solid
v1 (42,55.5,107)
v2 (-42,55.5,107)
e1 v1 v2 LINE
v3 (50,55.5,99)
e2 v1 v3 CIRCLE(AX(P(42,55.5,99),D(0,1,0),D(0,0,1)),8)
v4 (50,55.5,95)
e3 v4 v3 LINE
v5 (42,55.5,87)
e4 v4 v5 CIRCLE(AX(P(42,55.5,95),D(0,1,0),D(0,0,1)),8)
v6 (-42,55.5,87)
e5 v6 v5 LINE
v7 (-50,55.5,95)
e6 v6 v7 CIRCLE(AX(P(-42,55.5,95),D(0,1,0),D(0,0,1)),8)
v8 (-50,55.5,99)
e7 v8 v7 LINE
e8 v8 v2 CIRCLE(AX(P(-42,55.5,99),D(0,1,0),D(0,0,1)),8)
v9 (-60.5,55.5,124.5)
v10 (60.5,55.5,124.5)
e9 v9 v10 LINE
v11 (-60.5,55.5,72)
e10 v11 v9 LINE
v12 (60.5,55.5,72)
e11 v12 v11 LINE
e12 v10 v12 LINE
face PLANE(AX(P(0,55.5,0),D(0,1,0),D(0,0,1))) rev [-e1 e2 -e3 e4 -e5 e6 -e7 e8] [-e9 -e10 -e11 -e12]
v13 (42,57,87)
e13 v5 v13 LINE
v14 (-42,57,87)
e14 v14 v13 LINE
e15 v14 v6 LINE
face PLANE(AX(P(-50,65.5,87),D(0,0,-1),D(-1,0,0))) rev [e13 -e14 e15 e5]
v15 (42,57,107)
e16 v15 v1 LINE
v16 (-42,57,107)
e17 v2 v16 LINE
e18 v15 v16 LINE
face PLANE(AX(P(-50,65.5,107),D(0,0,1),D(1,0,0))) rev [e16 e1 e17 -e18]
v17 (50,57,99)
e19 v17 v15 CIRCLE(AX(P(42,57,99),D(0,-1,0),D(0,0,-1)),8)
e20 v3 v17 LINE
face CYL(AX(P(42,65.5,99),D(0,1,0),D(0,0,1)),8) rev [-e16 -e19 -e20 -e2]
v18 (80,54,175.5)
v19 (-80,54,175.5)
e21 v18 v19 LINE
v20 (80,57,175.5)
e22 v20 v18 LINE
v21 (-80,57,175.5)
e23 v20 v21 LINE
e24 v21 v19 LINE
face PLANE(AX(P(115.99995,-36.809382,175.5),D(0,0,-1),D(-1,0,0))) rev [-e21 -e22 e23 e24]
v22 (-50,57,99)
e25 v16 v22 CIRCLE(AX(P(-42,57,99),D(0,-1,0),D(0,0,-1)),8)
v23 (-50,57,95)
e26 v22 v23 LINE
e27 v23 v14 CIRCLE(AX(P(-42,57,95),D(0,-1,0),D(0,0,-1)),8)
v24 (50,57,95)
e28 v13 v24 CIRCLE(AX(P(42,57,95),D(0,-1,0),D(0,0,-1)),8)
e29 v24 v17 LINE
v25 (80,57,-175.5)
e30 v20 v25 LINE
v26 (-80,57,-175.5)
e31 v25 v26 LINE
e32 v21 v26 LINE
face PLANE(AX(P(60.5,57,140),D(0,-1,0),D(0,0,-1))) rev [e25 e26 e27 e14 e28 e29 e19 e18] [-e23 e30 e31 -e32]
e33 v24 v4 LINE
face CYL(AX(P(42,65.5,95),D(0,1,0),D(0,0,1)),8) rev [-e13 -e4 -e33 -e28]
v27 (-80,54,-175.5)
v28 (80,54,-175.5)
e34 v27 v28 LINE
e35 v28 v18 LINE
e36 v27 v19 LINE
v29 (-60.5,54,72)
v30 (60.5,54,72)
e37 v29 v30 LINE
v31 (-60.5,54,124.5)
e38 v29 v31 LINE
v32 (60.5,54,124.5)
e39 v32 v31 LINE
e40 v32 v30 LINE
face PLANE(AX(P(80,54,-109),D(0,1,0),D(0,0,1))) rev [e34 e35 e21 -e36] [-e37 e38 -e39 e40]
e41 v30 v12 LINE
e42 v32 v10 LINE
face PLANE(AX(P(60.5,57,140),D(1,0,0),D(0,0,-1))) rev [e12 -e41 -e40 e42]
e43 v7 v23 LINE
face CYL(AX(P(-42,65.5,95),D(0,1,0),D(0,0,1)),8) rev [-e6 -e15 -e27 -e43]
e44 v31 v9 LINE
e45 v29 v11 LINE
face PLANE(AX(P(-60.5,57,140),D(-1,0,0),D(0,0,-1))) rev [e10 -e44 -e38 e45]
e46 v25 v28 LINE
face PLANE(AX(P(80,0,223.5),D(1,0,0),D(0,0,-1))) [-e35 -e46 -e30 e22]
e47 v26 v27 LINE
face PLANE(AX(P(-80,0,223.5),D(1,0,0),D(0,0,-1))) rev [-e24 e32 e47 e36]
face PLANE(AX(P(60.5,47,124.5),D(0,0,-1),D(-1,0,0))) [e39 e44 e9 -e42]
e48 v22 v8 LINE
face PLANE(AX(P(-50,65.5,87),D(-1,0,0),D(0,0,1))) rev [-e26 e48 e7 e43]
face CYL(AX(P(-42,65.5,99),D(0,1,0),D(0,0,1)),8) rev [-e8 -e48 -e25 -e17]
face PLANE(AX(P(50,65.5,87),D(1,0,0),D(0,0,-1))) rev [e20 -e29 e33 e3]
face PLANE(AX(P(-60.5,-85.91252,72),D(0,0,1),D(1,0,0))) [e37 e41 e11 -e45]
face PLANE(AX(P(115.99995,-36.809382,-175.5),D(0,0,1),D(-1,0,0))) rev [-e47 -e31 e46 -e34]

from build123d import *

# Parameters (mm, degrees)
EXTRUDE_1_DEPTH          = 140
EXTRUDE_1_DEPTH_BACK     = 140
EXTRUDE_3_DEPTH          = 35.5
CUT_EXTRUDE_2_REACH      = 197.473
SKETCH_6_W               = 150
SKETCH_6_H               = 80
CUT_EXTRUDE_4_DEPTH      = 6
EXTRUDE_4_DEPTH          = 60.5
CUT_EXTRUDE_START        = -59
CUT_EXTRUDE_6_DEPTH      = 55
CUT_EXTRUDE_START_2      = -4
CUT_EXTRUDE_7_DEPTH      = 27
CUT_EXTRUDE_8_DEPTH      = 35.5
CUT_EXTRUDE_START_3      = -35.5
CUT_EXTRUDE_9_DEPTH      = 35.5
EXTRUDE_5_REACH          = 300.939
SKETCH_25_W              = 121
SKETCH_25_H              = 10
EXTRUDE_6_DEPTH          = 21.5
SKETCH_27_W              = 121
SKETCH_27_H              = 52.5
EXTRUDE_7_DEPTH          = 1.5
SKETCH_28_W              = 121
SKETCH_28_H              = 2
EXTRUDE_8_DEPTH          = 10
CUT_EXTRUDE_11_REACH     = 346.114
SKETCH_29_R              = 2
PATTERN_CIRCULAR_2_COUNT = 10
CUT_EXTRUDE_12_REACH     = 346.114
SKETCH_30_R              = 2
PATTERN_CIRCULAR_3_COUNT = 10
MIRROR_START             = -140
MIRROR_10_OUTLINE_R      = 2
MIRROR_10_DEPTH          = 280
MIRROR_10_2_OUTLINE_R    = 2
MIRROR_10_2_DEPTH        = 4
MIRROR_START_2           = 136
MIRROR_10_3_OUTLINE_R    = 2
MIRROR_10_3_DEPTH        = 4
EXTRUDE_9_REACH          = 263.648
SKETCH_31_W              = 21
SKETCH_31_H              = 16.5
EXTRUDE_10_REACH         = 292.975
SKETCH_34_W              = 121
SKETCH_34_H              = 154
EXTRUDE_11_DEPTH         = 5
EXTRUDE_12_REACH         = 378.928
SKETCH_36_W              = 121
SKETCH_36_H              = 3
EXTRUDE_13_REACH         = 378.928
SKETCH_37_W              = 121
SKETCH_37_H              = 3
SKETCH_38_W              = 100
SKETCH_38_H              = 20
CUT_EXTRUDE_13_DEPTH     = 10
FILLET_1_R               = 8
SKETCH_40_W              = 344.103621996
SKETCH_40_H              = 61.572842363
SKETCH_40_W_2            = 92.051810998
SKETCH_40_H_2            = 3
CUT_EXTRUDE_16_DEPTH     = 399


# Read off the part's stored shape, not the designer's step: 镜向10
with BuildPart() as part:
    # 草图2 → 凸台-拉伸1 (new, two sides: drawn at the far end of the back side and taken through both)
    with BuildSketch(Plane.XY.offset(-EXTRUDE_1_DEPTH_BACK)):
        with BuildLine():
            Line((60.5, 57), (80, 57))
            add(Edge.make_bspline(
                [(80, 57), (110.715171184, 57), (118.023084898, 36.99301361), (125, 20.498008369), (125, 0)],
                knots=[0, 0, 0, 0, 0, 1, 1, 1, 1, 1], degree=4))
            add(Edge.make_bspline(
                [(80, -57), (110.715171184, -57), (118.023084898, -36.99301361), (125, -20.498008369), (125, 0)],
                knots=[0, 0, 0, 0, 0, 1, 1, 1, 1, 1], degree=4))
            Line((80, -57), (60.5, -57))
            Line((60.5, -57), (60.5, -35.5))
            ThreePointArc((60.5, -35.5), (96, 0), (60.5, 35.5))
            Line((60.5, 35.5), (60.5, 57))
        make_face()
    extrude(amount=EXTRUDE_1_DEPTH + EXTRUDE_1_DEPTH_BACK)

    # 草图5 → 凸台-拉伸3 (add)
    with BuildSketch(Plane.XY.offset(140)):
        with BuildLine():
            Line((60.5, -50), (60.5, -57))
            Line((60.5, -57), (80, -57))
            add(Edge.make_bspline(
                [(80, -57), (110.715171184, -57), (118.023084898, -36.99301361), (125, -20.498008369), (125, 0)],
                knots=[0, 0, 0, 0, 0, 1, 1, 1, 1, 1], degree=4))
            add(Edge.make_bspline(
                [(125, 0), (125, 20.498008369), (118.023084898, 36.99301361), (110.715171184, 57), (80, 57)],
                knots=[0, 0, 0, 0, 0, 1, 1, 1, 1, 1], degree=4))
            Line((80, 57), (60.5, 57))
            Line((60.5, 57), (60.5, 50))
            ThreePointArc((60.5, 50), (110.5, 0), (60.5, -50))
        make_face()
    extrude_3 = extrude(amount=EXTRUDE_3_DEPTH)

    # 镜向2: 凸台-拉伸3 across plane
    add(extrude_3.mirror(Plane.XY))

    # 草图6 → 切除-拉伸2 (cut, up to next)
    with BuildSketch(Plane.ZY.offset(-60.5), mode=Mode.PRIVATE) as cut_extrude_2_sk1:
        with Locations((-15, 0)):
            Rectangle(SKETCH_6_W, SKETCH_6_H)
    cut_extrude_2_tool1 = extrude(cut_extrude_2_sk1.sketch, amount=-CUT_EXTRUDE_2_REACH, mode=Mode.PRIVATE) & part.part
    add(cut_extrude_2_tool1.solids().sort_by_distance((60.5, 0, -15))[0], mode=Mode.SUBTRACT)

    # 草图9 → 切除-拉伸4 (cut, symmetric)
    with BuildSketch(Plane(origin=(0, 0, 0), x_dir=(1, 0, 0), z_dir=(0, 1, 0))):
        Polygon((113.429186382, -60), (119.929186382, -60), (119.929186382, -75), (116.929186382, -75), (111.929186382, -69.041232037), (113.429186382, -67.541232037), align=None)
    cut_extrude_4 = extrude(amount=CUT_EXTRUDE_4_DEPTH, both=True, mode=Mode.SUBTRACT)

    # 镜向3: 切除-拉伸4 across plane
    add(cut_extrude_4.mirror(Plane(origin=(0, 0, -15), x_dir=(1, 0, 0), z_dir=(0, 0, -1))), mode=Mode.SUBTRACT)

    # 草图10 → 凸台-拉伸4 (add)
    with BuildSketch(Plane.ZY.offset(-60.5)):
        Polygon((-90, 40), (-90, 35.5), (-92, 35.5), (-92, 42), (62, 42), (62, 35.5), (60, 35.5), (60, 40), align=None)
    extrude(amount=EXTRUDE_4_DEPTH)

    # 草图18 → 切除-拉伸6 (cut)
    with BuildSketch(Plane.XY.offset(140).offset(CUT_EXTRUDE_START)):
        with BuildLine():
            Line((60.5, 54), (60.5, 35.5))
            ThreePointArc((60.5, 35.5), (96, 0), (60.5, -35.5))
            Line((60.5, -35.5), (60.5, -54))
            Line((60.5, -54), (80, -54))
            add(Edge.make_bspline(
                [(80, -54), (84.874930894, -54), (88.983824843, -53.408674679), (94.293485921, -51.914645093), (95.921328006, -51.314644751), (98.940749379, -49.944603182), (100.332473442, -49.174486853), (102.921509382, -47.489185635), (104.118858715, -46.573864409), (106.351651802, -44.617586852), (107.387031345, -43.57654345), (110.285874468, -40.291394559), (111.943828956, -37.885646851), (114.834227827, -32.778060673), (116.065931681, -30.077252128), (118.174928997, -24.486846885), (119.052306998, -21.597764181), (120.481395372, -15.683640995), (121.033233096, -12.658872533), (121.792444122, -6.461288023), (122, -3.288695832), (122, 0)],
                knots=[0, 0, 0, 0, 0.125, 0.125, 0.1875, 0.1875, 0.25, 0.25, 0.3125, 0.3125, 0.375, 0.375, 0.5, 0.5, 0.625, 0.625, 0.75, 0.75, 0.875, 0.875, 1, 1, 1, 1], degree=3))
            add(Edge.make_bspline(
                [(122, 0), (122, 3.288695832), (121.792444122, 6.461288023), (121.033233096, 12.658872533), (120.481395372, 15.683640995), (119.052306998, 21.597764181), (118.174928997, 24.486846885), (116.065931681, 30.077252128), (114.834227827, 32.778060673), (111.943828956, 37.885646851), (110.285874468, 40.291394559), (107.387031345, 43.57654345), (106.351651802, 44.617586852), (104.118858715, 46.573864409), (102.921509382, 47.489185635), (100.332473442, 49.174486853), (98.940749379, 49.944603182), (95.921328006, 51.314644751), (94.293485921, 51.914645093), (88.983824843, 53.408674679), (84.874930894, 54), (80, 54)],
                knots=[0, 0, 0, 0, 0.125, 0.125, 0.25, 0.25, 0.375, 0.375, 0.5, 0.5, 0.625, 0.625, 0.6875, 0.6875, 0.75, 0.75, 0.8125, 0.8125, 0.875, 0.875, 1, 1, 1, 1], degree=3))
            Line((80, 54), (60.5, 54))
        make_face()
    extrude(amount=CUT_EXTRUDE_6_DEPTH, mode=Mode.SUBTRACT)

    # 草图19 → 切除-拉伸7 (cut)
    with BuildSketch(Plane(origin=(0, 0, -140), x_dir=(-1, 0, 0), z_dir=(0, 0, -1)).offset(CUT_EXTRUDE_START_2)):
        with BuildLine():
            Line((-60.5, 54), (-60.5, 35.5))
            ThreePointArc((-60.5, 35.5), (-96, 0), (-60.5, -35.5))
            Line((-60.5, -35.5), (-60.5, -54))
            Line((-60.5, -54), (-80, -54))
            add(Edge.make_bspline(
                [(-80, -54), (-84.874930894, -54), (-88.983824843, -53.408674679), (-94.293485921, -51.914645093), (-95.921328006, -51.314644751), (-98.940749379, -49.944603182), (-100.332473442, -49.174486853), (-102.921509382, -47.489185635), (-104.118858715, -46.573864409), (-106.351651802, -44.617586852), (-107.387031345, -43.57654345), (-110.285874468, -40.291394559), (-111.943828956, -37.885646851), (-114.834227827, -32.778060673), (-116.065931681, -30.077252128), (-118.174928997, -24.486846885), (-119.052306998, -21.597764181), (-120.481395372, -15.683640995), (-121.033233096, -12.658872533), (-121.792444122, -6.461288023), (-122, -3.288695832), (-122, 0)],
                knots=[0, 0, 0, 0, 0.125, 0.125, 0.1875, 0.1875, 0.25, 0.25, 0.3125, 0.3125, 0.375, 0.375, 0.5, 0.5, 0.625, 0.625, 0.75, 0.75, 0.875, 0.875, 1, 1, 1, 1], degree=3))
            add(Edge.make_bspline(
                [(-122, 0), (-122, 3.288695832), (-121.792444122, 6.461288023), (-121.033233096, 12.658872533), (-120.481395372, 15.683640995), (-119.052306998, 21.597764181), (-118.174928997, 24.486846885), (-116.065931681, 30.077252128), (-114.834227827, 32.778060673), (-111.943828956, 37.885646851), (-110.285874468, 40.291394559), (-107.387031345, 43.57654345), (-106.351651802, 44.617586852), (-104.118858715, 46.573864409), (-102.921509382, 47.489185635), (-100.332473442, 49.174486853), (-98.940749379, 49.944603182), (-95.921328006, 51.314644751), (-94.293485921, 51.914645093), (-88.983824843, 53.408674679), (-84.874930894, 54), (-80, 54)],
                knots=[0, 0, 0, 0, 0.125, 0.125, 0.25, 0.25, 0.375, 0.375, 0.5, 0.5, 0.625, 0.625, 0.6875, 0.6875, 0.75, 0.75, 0.8125, 0.8125, 0.875, 0.875, 1, 1, 1, 1], degree=3))
            Line((-80, 54), (-60.5, 54))
        make_face()
    extrude(amount=-CUT_EXTRUDE_7_DEPTH, mode=Mode.SUBTRACT)

    # 草图20 → 切除-拉伸8 (cut)
    with BuildSketch(Plane.XY.offset(175.5)):
        with BuildLine():
            Line((60.5, 54), (60.5, 50))
            ThreePointArc((60.5, 50), (110.5, 0), (60.5, -50))
            Line((60.5, -50), (60.5, -54))
            Line((60.5, -54), (80, -54))
            add(Edge.make_bspline(
                [(80, -54), (84.874930894, -54), (88.983824843, -53.408674679), (94.293485921, -51.914645093), (95.921328006, -51.314644751), (98.940749379, -49.944603182), (100.332473442, -49.174486853), (102.921509382, -47.489185635), (104.118858715, -46.573864409), (106.351651802, -44.617586852), (107.387031345, -43.57654345), (110.285874468, -40.291394559), (111.943828956, -37.885646851), (114.834227827, -32.778060673), (116.065931681, -30.077252128), (118.174928997, -24.486846885), (119.052306998, -21.597764181), (120.481395372, -15.683640995), (121.033233096, -12.658872533), (121.792444122, -6.461288023), (122, -3.288695832), (122, 0)],
                knots=[0, 0, 0, 0, 0.125, 0.125, 0.1875, 0.1875, 0.25, 0.25, 0.3125, 0.3125, 0.375, 0.375, 0.5, 0.5, 0.625, 0.625, 0.75, 0.75, 0.875, 0.875, 1, 1, 1, 1], degree=3))
            add(Edge.make_bspline(
                [(122, 0), (122, 3.288695832), (121.792444122, 6.461288023), (121.033233096, 12.658872533), (120.481395372, 15.683640995), (119.052306998, 21.597764181), (118.174928997, 24.486846885), (116.065931681, 30.077252128), (114.834227827, 32.778060673), (111.943828956, 37.885646851), (110.285874468, 40.291394559), (107.387031345, 43.57654345), (106.351651802, 44.617586852), (104.118858715, 46.573864409), (102.921509382, 47.489185635), (100.332473442, 49.174486853), (98.940749379, 49.944603182), (95.921328006, 51.314644751), (94.293485921, 51.914645093), (88.983824843, 53.408674679), (84.874930894, 54), (80, 54)],
                knots=[0, 0, 0, 0, 0.125, 0.125, 0.25, 0.25, 0.375, 0.375, 0.5, 0.5, 0.625, 0.625, 0.6875, 0.6875, 0.75, 0.75, 0.8125, 0.8125, 0.875, 0.875, 1, 1, 1, 1], degree=3))
            Line((80, 54), (60.5, 54))
        make_face()
    extrude(amount=-CUT_EXTRUDE_8_DEPTH, mode=Mode.SUBTRACT)

    # 草图21 → 切除-拉伸9 (cut)
    with BuildSketch(Plane(origin=(0, 0, -175.5), x_dir=(-1, 0, 0), z_dir=(0, 0, -1)).offset(CUT_EXTRUDE_START_3)):
        with BuildLine():
            Line((-60.5, -50), (-60.5, -54))
            Line((-60.5, -54), (-80, -54))
            add(Edge.make_bspline(
                [(-80, -54), (-84.874930894, -54), (-88.983824843, -53.408674679), (-94.293485921, -51.914645093), (-95.921328006, -51.314644751), (-98.940749379, -49.944603182), (-100.332473442, -49.174486853), (-102.921509382, -47.489185635), (-104.118858715, -46.573864409), (-106.351651802, -44.617586852), (-107.387031345, -43.57654345), (-110.285874468, -40.291394559), (-111.943828956, -37.885646851), (-114.834227827, -32.778060673), (-116.065931681, -30.077252128), (-118.174928997, -24.486846885), (-119.052306998, -21.597764181), (-120.481395372, -15.683640995), (-121.033233096, -12.658872533), (-121.792444122, -6.461288023), (-122, -3.288695832), (-122, 0)],
                knots=[0, 0, 0, 0, 0.125, 0.125, 0.1875, 0.1875, 0.25, 0.25, 0.3125, 0.3125, 0.375, 0.375, 0.5, 0.5, 0.625, 0.625, 0.75, 0.75, 0.875, 0.875, 1, 1, 1, 1], degree=3))
            add(Edge.make_bspline(
                [(-122, 0), (-122, 3.288695832), (-121.792444122, 6.461288023), (-121.033233096, 12.658872533), (-120.481395372, 15.683640995), (-119.052306998, 21.597764181), (-118.174928997, 24.486846885), (-116.065931681, 30.077252128), (-114.834227827, 32.778060673), (-111.943828956, 37.885646851), (-110.285874468, 40.291394559), (-107.387031345, 43.57654345), (-106.351651802, 44.617586852), (-104.118858715, 46.573864409), (-102.921509382, 47.489185635), (-100.332473442, 49.174486853), (-98.940749379, 49.944603182), (-95.921328006, 51.314644751), (-94.293485921, 51.914645093), (-88.983824843, 53.408674679), (-84.874930894, 54), (-80, 54)],
                knots=[0, 0, 0, 0, 0.125, 0.125, 0.25, 0.25, 0.375, 0.375, 0.5, 0.5, 0.625, 0.625, 0.6875, 0.6875, 0.75, 0.75, 0.8125, 0.8125, 0.875, 0.875, 1, 1, 1, 1], degree=3))
            Line((-80, 54), (-60.5, 54))
            Line((-60.5, 54), (-60.5, 50))
            ThreePointArc((-60.5, 50), (-110.5, 0), (-60.5, -50))
        make_face()
    extrude(amount=CUT_EXTRUDE_9_DEPTH, mode=Mode.SUBTRACT)

    # 镜向9: part across plane


with BuildPart() as part_1:
    add(part.part)
    add(part.part.mirror(Plane.ZY))

    # 草图23 → 凸台-拉伸5 (add, up to next)
    with BuildSketch(Plane.XY.offset(-90), mode=Mode.PRIVATE) as extrude_5_sk1:
        with BuildLine():
            Line((-114.034351089, 40), (-110, 40))
            Line((-110, 40), (-110, -40))
            Line((-110, -40), (-114.034351089, -40))
            add(Edge.make_bspline(
                [(-114.034351089, -40), (-119.771865737, -31.446745908), (-122.888445187, -21.34184926), (-125, -11.276676628), (-125, 0)],
                knots=[0.449864766, 0.449864766, 0.449864766, 0.449864766, 0.449864766, 1, 1, 1, 1, 1], degree=4))
            add(Edge.make_bspline(
                [(-125, 0), (-125, 11.276676628), (-122.888445187, 21.34184926), (-119.771865737, 31.446745908), (-114.034351089, 40)],
                knots=[0, 0, 0, 0, 0, 0.550135234, 0.550135234, 0.550135234, 0.550135234, 0.550135234], degree=4))
        make_face()
    extrude_5_tool1 = extrude(extrude_5_sk1.sketch, amount=EXTRUDE_5_REACH, mode=Mode.PRIVATE) - part_1.part
    add(extrude_5_tool1.solids().sort_by_distance((-116.2158, 0, -90))[0])

    # 草图25 → 凸台-拉伸6 (add)
    with BuildSketch(Plane(origin=(0, 57, 0), x_dir=(1, 0, 0), z_dir=(0, 1, 0))):
        with Locations((0, -67)):
            Rectangle(SKETCH_25_W, SKETCH_25_H)
    extrude(amount=-EXTRUDE_6_DEPTH)



with BuildPart() as body_2:
    # 草图27 → 凸台-拉伸7 (new body)
    with BuildSketch(Plane(origin=(0, 57, 0), x_dir=(1, 0, 0), z_dir=(0, 1, 0))):
        with Locations((0, -98.25)):
            Rectangle(SKETCH_27_W, SKETCH_27_H)
    extrude(amount=-EXTRUDE_7_DEPTH)


with BuildPart() as part_2:
    add(part_1.part)

    add(body_2.part)  # 凸台-拉伸8 merges body 2
    # 草图28 → 凸台-拉伸8 (add)
    with BuildSketch(Plane(origin=(0, 57, 0), x_dir=(1, 0, 0), z_dir=(0, 1, 0))):
        with Locations((0, -125.5)):
            Rectangle(SKETCH_28_W, SKETCH_28_H)
    extrude(amount=-EXTRUDE_8_DEPTH)

    # 草图29 → 切除-拉伸11 (cut, up to next)
    with BuildSketch(Plane.XY.offset(140), mode=Mode.PRIVATE) as cut_extrude_11_sk1:
        with Locations((-85.186980596, 33.978713764)):
            Circle(SKETCH_29_R)
    cut_extrude_11_tool1 = extrude(cut_extrude_11_sk1.sketch, amount=-CUT_EXTRUDE_11_REACH, mode=Mode.PRIVATE) & part_2.part
    cut_extrude_11 = cut_extrude_11_tool1.solids().sort_by_distance((-85.186981, 33.978714, 140))[0]
    add(cut_extrude_11, mode=Mode.SUBTRACT)

    # 阵列(圆周)2: 切除-拉伸11 ×10 about axis, 6 skipped
    pattern_circular_2_axis = Axis((-60.5, 0, 140), (0, 0, -1))
    add([cut_extrude_11.rotate(pattern_circular_2_axis, i * 360 / PATTERN_CIRCULAR_2_COUNT) for i in range(1, PATTERN_CIRCULAR_2_COUNT) if i not in (1, 2, 3, 4, 5, 6)], mode=Mode.SUBTRACT)

    # 草图30 → 切除-拉伸12 (cut, up to next)
    with BuildSketch(Plane(origin=(0, 0, -140), x_dir=(-1, 0, 0), z_dir=(0, 0, -1)), mode=Mode.PRIVATE) as cut_extrude_12_sk1:
        with Locations(Location((85.186980596, 33.978713764, 0), (0, 0, 180))):
            Circle(SKETCH_30_R)
    cut_extrude_12_tool1 = extrude(cut_extrude_12_sk1.sketch, amount=-CUT_EXTRUDE_12_REACH, mode=Mode.PRIVATE) & part_2.part
    cut_extrude_12 = cut_extrude_12_tool1.solids().sort_by_distance((-85.186981, 33.978714, -140))[0]
    add(cut_extrude_12, mode=Mode.SUBTRACT)

    # 阵列(圆周)3: 切除-拉伸12 ×10 about axis, 6 skipped
    pattern_circular_3_axis = Axis((-60.5, 0, 140), (0, 0, -1))
    add([cut_extrude_12.rotate(pattern_circular_3_axis, i * 360 / PATTERN_CIRCULAR_3_COUNT) for i in range(1, PATTERN_CIRCULAR_3_COUNT) if i not in (1, 2, 3, 4, 5, 6)], mode=Mode.SUBTRACT)

    # 镜向10 outline → 镜向10 (cut)
    with BuildSketch(Plane.XY.offset(MIRROR_START)):
        with Locations((85.186980596, 33.978713764)):
            Circle(MIRROR_10_OUTLINE_R)
    extrude(amount=MIRROR_10_DEPTH, mode=Mode.SUBTRACT)

    # Mirror 10 2 outline → Mirror 10 2 (cut)
    with BuildSketch(Plane.XY.offset(MIRROR_START)):
        with Locations((100.444373684, 12.978713764)):
            Circle(MIRROR_10_2_OUTLINE_R)
        with Locations((100.444373684, -12.978713764)):
            Circle(MIRROR_10_2_OUTLINE_R)
        with Locations((85.186980596, -33.978713764)):
            Circle(MIRROR_10_2_OUTLINE_R)
    extrude(amount=MIRROR_10_2_DEPTH, mode=Mode.SUBTRACT)

    # Mirror 10 3 outline → Mirror 10 3 (cut)
    with BuildSketch(Plane.XY.offset(MIRROR_START_2)):
        with Locations((100.444373684, 12.978713764)):
            Circle(MIRROR_10_3_OUTLINE_R)
        with Locations((100.444373684, -12.978713764)):
            Circle(MIRROR_10_3_OUTLINE_R)
        with Locations((85.186980596, -33.978713764)):
            Circle(MIRROR_10_3_OUTLINE_R)
    extrude(amount=MIRROR_10_3_DEPTH, mode=Mode.SUBTRACT)

    # 草图31 → 凸台-拉伸9 (add, up to next)
    with BuildSketch(Plane(origin=(-60.5, 0, 0), x_dir=(0, 0, -1), z_dir=(1, 0, 0)), mode=Mode.PRIVATE) as extrude_9_sk1:
        with Locations((-70.5, -43.75)):
            Rectangle(SKETCH_31_W, SKETCH_31_H)
    extrude_9_tool1 = extrude(extrude_9_sk1.sketch, amount=EXTRUDE_9_REACH, mode=Mode.PRIVATE) - part_2.part
    # 草图31 → 凸台-拉伸9 (add, up to next)
    with BuildSketch(Plane(origin=(-60.5, 0, 0), x_dir=(0, 0, -1), z_dir=(1, 0, 0)), mode=Mode.PRIVATE) as extrude_9_sk2:
        Polygon((109, -52), (109, -35.5), (90, -35.5), (90, -40), (90, -52), align=None)
    extrude_9_tool2 = extrude(extrude_9_sk2.sketch, amount=EXTRUDE_9_REACH, mode=Mode.PRIVATE) - part_2.part
    add(extrude_9_tool1.solids().sort_by_distance((-60.5, -43.75, 70.5))[0])
    add(extrude_9_tool2.solids().sort_by_distance((-60.5, -43.75, -99.5))[0])

    # 草图33 → 凸台-拉伸10 (add, up to next)
    with BuildSketch(Plane.XY.offset(81), mode=Mode.PRIVATE) as extrude_10_sk1:
        with BuildLine():
            Line((62.5, 54), (62.5, 35.443617197))
            ThreePointArc((62.5, 35.443617197), (61.500397299, 35.4859015), (60.5, 35.5))
            Line((60.5, 35.5), (60.5, 54))
            Line((60.5, 54), (62.5, 54))
        make_face()
    extrude_10_tool1 = extrude(extrude_10_sk1.sketch, amount=EXTRUDE_10_REACH, mode=Mode.PRIVATE) - part_2.part
    extrude_10 = extrude_10_tool1.solids().sort_by_distance((61.500507, 44.740598, 81))[0]
    add(extrude_10)

    # 镜向11: 凸台-拉伸10 across plane
    add(extrude_10.mirror(Plane(origin=(0, 0, 0), x_dir=(0, 0, 1), z_dir=(1, 0, 0))))

    # 草图34 → 凸台-拉伸11 (add)
    with BuildSketch(Plane(origin=(0, 42, 0), x_dir=(1, 0, 0), z_dir=(0, 1, 0))):
        with Locations((0, 15)):
            Rectangle(SKETCH_34_W, SKETCH_34_H)
    extrude(amount=EXTRUDE_11_DEPTH)

    # 草图36 → 凸台-拉伸12 (add, up to next)
    with BuildSketch(Plane.XY.offset(175.5), mode=Mode.PRIVATE) as extrude_12_sk1:
        with Locations((0, 55.5)):
            Rectangle(SKETCH_36_W, SKETCH_36_H)
    extrude_12_tool1 = extrude(extrude_12_sk1.sketch, amount=-EXTRUDE_12_REACH, mode=Mode.PRIVATE) - part_2.part
    add(extrude_12_tool1.solids().sort_by_distance((0, 55.5, 175.5))[0])

    # 草图37 → 凸台-拉伸13 (add, up to next)
    with BuildSketch(Plane(origin=(0, 0, -175.5), x_dir=(-1, 0, 0), z_dir=(0, 0, -1)), mode=Mode.PRIVATE) as extrude_13_sk1:
        with Locations((0, 55.5)):
            Rectangle(SKETCH_37_W, SKETCH_37_H)
    extrude_13_tool1 = extrude(extrude_13_sk1.sketch, amount=-EXTRUDE_13_REACH, mode=Mode.PRIVATE) - part_2.part
    add(extrude_13_tool1.solids().sort_by_distance((0, 55.5, -175.5))[0])

    # 草图38 → 切除-拉伸13 (cut)
    with BuildSketch(Plane.XZ.offset(-55.5)):
        with Locations((0, 97)):
            Rectangle(SKETCH_38_W, SKETCH_38_H)
    extrude(amount=-CUT_EXTRUDE_13_DEPTH, mode=Mode.SUBTRACT)

    # 圆角1
    fillet_1_edges = [part_2.edges().sort_by_distance(p)[0] for p in [
        (50, 56.25, 107),
        (50, 56.25, 87),
        (-50, 56.25, 87),
        (-50, 56.25, 107),
    ]]
    fillet(fillet_1_edges, radius=FILLET_1_R)

    # 草图40 → 切除-拉伸16 (cut)
    with BuildSketch(Plane(origin=(0, 0, -175.5), x_dir=(-1, 0, 0), z_dir=(0, 0, -1))):
        Polygon((-172.051810998, 54), (-172.051810998, -54), (172.051810998, -54), (172.051810998, 54), (80, 54), (-80, 54), align=None)
        with Locations((0, -84.786421182)):
            Rectangle(SKETCH_40_W, SKETCH_40_H)
        with Locations((-126.025905499, 55.5)):
            Rectangle(SKETCH_40_W_2, SKETCH_40_H_2)
        with Locations((126.025905499, 55.5)):
            Rectangle(SKETCH_40_W_2, SKETCH_40_H_2)
    extrude(amount=-CUT_EXTRUDE_16_DEPTH, mode=Mode.SUBTRACT)


solid = part_2.part
